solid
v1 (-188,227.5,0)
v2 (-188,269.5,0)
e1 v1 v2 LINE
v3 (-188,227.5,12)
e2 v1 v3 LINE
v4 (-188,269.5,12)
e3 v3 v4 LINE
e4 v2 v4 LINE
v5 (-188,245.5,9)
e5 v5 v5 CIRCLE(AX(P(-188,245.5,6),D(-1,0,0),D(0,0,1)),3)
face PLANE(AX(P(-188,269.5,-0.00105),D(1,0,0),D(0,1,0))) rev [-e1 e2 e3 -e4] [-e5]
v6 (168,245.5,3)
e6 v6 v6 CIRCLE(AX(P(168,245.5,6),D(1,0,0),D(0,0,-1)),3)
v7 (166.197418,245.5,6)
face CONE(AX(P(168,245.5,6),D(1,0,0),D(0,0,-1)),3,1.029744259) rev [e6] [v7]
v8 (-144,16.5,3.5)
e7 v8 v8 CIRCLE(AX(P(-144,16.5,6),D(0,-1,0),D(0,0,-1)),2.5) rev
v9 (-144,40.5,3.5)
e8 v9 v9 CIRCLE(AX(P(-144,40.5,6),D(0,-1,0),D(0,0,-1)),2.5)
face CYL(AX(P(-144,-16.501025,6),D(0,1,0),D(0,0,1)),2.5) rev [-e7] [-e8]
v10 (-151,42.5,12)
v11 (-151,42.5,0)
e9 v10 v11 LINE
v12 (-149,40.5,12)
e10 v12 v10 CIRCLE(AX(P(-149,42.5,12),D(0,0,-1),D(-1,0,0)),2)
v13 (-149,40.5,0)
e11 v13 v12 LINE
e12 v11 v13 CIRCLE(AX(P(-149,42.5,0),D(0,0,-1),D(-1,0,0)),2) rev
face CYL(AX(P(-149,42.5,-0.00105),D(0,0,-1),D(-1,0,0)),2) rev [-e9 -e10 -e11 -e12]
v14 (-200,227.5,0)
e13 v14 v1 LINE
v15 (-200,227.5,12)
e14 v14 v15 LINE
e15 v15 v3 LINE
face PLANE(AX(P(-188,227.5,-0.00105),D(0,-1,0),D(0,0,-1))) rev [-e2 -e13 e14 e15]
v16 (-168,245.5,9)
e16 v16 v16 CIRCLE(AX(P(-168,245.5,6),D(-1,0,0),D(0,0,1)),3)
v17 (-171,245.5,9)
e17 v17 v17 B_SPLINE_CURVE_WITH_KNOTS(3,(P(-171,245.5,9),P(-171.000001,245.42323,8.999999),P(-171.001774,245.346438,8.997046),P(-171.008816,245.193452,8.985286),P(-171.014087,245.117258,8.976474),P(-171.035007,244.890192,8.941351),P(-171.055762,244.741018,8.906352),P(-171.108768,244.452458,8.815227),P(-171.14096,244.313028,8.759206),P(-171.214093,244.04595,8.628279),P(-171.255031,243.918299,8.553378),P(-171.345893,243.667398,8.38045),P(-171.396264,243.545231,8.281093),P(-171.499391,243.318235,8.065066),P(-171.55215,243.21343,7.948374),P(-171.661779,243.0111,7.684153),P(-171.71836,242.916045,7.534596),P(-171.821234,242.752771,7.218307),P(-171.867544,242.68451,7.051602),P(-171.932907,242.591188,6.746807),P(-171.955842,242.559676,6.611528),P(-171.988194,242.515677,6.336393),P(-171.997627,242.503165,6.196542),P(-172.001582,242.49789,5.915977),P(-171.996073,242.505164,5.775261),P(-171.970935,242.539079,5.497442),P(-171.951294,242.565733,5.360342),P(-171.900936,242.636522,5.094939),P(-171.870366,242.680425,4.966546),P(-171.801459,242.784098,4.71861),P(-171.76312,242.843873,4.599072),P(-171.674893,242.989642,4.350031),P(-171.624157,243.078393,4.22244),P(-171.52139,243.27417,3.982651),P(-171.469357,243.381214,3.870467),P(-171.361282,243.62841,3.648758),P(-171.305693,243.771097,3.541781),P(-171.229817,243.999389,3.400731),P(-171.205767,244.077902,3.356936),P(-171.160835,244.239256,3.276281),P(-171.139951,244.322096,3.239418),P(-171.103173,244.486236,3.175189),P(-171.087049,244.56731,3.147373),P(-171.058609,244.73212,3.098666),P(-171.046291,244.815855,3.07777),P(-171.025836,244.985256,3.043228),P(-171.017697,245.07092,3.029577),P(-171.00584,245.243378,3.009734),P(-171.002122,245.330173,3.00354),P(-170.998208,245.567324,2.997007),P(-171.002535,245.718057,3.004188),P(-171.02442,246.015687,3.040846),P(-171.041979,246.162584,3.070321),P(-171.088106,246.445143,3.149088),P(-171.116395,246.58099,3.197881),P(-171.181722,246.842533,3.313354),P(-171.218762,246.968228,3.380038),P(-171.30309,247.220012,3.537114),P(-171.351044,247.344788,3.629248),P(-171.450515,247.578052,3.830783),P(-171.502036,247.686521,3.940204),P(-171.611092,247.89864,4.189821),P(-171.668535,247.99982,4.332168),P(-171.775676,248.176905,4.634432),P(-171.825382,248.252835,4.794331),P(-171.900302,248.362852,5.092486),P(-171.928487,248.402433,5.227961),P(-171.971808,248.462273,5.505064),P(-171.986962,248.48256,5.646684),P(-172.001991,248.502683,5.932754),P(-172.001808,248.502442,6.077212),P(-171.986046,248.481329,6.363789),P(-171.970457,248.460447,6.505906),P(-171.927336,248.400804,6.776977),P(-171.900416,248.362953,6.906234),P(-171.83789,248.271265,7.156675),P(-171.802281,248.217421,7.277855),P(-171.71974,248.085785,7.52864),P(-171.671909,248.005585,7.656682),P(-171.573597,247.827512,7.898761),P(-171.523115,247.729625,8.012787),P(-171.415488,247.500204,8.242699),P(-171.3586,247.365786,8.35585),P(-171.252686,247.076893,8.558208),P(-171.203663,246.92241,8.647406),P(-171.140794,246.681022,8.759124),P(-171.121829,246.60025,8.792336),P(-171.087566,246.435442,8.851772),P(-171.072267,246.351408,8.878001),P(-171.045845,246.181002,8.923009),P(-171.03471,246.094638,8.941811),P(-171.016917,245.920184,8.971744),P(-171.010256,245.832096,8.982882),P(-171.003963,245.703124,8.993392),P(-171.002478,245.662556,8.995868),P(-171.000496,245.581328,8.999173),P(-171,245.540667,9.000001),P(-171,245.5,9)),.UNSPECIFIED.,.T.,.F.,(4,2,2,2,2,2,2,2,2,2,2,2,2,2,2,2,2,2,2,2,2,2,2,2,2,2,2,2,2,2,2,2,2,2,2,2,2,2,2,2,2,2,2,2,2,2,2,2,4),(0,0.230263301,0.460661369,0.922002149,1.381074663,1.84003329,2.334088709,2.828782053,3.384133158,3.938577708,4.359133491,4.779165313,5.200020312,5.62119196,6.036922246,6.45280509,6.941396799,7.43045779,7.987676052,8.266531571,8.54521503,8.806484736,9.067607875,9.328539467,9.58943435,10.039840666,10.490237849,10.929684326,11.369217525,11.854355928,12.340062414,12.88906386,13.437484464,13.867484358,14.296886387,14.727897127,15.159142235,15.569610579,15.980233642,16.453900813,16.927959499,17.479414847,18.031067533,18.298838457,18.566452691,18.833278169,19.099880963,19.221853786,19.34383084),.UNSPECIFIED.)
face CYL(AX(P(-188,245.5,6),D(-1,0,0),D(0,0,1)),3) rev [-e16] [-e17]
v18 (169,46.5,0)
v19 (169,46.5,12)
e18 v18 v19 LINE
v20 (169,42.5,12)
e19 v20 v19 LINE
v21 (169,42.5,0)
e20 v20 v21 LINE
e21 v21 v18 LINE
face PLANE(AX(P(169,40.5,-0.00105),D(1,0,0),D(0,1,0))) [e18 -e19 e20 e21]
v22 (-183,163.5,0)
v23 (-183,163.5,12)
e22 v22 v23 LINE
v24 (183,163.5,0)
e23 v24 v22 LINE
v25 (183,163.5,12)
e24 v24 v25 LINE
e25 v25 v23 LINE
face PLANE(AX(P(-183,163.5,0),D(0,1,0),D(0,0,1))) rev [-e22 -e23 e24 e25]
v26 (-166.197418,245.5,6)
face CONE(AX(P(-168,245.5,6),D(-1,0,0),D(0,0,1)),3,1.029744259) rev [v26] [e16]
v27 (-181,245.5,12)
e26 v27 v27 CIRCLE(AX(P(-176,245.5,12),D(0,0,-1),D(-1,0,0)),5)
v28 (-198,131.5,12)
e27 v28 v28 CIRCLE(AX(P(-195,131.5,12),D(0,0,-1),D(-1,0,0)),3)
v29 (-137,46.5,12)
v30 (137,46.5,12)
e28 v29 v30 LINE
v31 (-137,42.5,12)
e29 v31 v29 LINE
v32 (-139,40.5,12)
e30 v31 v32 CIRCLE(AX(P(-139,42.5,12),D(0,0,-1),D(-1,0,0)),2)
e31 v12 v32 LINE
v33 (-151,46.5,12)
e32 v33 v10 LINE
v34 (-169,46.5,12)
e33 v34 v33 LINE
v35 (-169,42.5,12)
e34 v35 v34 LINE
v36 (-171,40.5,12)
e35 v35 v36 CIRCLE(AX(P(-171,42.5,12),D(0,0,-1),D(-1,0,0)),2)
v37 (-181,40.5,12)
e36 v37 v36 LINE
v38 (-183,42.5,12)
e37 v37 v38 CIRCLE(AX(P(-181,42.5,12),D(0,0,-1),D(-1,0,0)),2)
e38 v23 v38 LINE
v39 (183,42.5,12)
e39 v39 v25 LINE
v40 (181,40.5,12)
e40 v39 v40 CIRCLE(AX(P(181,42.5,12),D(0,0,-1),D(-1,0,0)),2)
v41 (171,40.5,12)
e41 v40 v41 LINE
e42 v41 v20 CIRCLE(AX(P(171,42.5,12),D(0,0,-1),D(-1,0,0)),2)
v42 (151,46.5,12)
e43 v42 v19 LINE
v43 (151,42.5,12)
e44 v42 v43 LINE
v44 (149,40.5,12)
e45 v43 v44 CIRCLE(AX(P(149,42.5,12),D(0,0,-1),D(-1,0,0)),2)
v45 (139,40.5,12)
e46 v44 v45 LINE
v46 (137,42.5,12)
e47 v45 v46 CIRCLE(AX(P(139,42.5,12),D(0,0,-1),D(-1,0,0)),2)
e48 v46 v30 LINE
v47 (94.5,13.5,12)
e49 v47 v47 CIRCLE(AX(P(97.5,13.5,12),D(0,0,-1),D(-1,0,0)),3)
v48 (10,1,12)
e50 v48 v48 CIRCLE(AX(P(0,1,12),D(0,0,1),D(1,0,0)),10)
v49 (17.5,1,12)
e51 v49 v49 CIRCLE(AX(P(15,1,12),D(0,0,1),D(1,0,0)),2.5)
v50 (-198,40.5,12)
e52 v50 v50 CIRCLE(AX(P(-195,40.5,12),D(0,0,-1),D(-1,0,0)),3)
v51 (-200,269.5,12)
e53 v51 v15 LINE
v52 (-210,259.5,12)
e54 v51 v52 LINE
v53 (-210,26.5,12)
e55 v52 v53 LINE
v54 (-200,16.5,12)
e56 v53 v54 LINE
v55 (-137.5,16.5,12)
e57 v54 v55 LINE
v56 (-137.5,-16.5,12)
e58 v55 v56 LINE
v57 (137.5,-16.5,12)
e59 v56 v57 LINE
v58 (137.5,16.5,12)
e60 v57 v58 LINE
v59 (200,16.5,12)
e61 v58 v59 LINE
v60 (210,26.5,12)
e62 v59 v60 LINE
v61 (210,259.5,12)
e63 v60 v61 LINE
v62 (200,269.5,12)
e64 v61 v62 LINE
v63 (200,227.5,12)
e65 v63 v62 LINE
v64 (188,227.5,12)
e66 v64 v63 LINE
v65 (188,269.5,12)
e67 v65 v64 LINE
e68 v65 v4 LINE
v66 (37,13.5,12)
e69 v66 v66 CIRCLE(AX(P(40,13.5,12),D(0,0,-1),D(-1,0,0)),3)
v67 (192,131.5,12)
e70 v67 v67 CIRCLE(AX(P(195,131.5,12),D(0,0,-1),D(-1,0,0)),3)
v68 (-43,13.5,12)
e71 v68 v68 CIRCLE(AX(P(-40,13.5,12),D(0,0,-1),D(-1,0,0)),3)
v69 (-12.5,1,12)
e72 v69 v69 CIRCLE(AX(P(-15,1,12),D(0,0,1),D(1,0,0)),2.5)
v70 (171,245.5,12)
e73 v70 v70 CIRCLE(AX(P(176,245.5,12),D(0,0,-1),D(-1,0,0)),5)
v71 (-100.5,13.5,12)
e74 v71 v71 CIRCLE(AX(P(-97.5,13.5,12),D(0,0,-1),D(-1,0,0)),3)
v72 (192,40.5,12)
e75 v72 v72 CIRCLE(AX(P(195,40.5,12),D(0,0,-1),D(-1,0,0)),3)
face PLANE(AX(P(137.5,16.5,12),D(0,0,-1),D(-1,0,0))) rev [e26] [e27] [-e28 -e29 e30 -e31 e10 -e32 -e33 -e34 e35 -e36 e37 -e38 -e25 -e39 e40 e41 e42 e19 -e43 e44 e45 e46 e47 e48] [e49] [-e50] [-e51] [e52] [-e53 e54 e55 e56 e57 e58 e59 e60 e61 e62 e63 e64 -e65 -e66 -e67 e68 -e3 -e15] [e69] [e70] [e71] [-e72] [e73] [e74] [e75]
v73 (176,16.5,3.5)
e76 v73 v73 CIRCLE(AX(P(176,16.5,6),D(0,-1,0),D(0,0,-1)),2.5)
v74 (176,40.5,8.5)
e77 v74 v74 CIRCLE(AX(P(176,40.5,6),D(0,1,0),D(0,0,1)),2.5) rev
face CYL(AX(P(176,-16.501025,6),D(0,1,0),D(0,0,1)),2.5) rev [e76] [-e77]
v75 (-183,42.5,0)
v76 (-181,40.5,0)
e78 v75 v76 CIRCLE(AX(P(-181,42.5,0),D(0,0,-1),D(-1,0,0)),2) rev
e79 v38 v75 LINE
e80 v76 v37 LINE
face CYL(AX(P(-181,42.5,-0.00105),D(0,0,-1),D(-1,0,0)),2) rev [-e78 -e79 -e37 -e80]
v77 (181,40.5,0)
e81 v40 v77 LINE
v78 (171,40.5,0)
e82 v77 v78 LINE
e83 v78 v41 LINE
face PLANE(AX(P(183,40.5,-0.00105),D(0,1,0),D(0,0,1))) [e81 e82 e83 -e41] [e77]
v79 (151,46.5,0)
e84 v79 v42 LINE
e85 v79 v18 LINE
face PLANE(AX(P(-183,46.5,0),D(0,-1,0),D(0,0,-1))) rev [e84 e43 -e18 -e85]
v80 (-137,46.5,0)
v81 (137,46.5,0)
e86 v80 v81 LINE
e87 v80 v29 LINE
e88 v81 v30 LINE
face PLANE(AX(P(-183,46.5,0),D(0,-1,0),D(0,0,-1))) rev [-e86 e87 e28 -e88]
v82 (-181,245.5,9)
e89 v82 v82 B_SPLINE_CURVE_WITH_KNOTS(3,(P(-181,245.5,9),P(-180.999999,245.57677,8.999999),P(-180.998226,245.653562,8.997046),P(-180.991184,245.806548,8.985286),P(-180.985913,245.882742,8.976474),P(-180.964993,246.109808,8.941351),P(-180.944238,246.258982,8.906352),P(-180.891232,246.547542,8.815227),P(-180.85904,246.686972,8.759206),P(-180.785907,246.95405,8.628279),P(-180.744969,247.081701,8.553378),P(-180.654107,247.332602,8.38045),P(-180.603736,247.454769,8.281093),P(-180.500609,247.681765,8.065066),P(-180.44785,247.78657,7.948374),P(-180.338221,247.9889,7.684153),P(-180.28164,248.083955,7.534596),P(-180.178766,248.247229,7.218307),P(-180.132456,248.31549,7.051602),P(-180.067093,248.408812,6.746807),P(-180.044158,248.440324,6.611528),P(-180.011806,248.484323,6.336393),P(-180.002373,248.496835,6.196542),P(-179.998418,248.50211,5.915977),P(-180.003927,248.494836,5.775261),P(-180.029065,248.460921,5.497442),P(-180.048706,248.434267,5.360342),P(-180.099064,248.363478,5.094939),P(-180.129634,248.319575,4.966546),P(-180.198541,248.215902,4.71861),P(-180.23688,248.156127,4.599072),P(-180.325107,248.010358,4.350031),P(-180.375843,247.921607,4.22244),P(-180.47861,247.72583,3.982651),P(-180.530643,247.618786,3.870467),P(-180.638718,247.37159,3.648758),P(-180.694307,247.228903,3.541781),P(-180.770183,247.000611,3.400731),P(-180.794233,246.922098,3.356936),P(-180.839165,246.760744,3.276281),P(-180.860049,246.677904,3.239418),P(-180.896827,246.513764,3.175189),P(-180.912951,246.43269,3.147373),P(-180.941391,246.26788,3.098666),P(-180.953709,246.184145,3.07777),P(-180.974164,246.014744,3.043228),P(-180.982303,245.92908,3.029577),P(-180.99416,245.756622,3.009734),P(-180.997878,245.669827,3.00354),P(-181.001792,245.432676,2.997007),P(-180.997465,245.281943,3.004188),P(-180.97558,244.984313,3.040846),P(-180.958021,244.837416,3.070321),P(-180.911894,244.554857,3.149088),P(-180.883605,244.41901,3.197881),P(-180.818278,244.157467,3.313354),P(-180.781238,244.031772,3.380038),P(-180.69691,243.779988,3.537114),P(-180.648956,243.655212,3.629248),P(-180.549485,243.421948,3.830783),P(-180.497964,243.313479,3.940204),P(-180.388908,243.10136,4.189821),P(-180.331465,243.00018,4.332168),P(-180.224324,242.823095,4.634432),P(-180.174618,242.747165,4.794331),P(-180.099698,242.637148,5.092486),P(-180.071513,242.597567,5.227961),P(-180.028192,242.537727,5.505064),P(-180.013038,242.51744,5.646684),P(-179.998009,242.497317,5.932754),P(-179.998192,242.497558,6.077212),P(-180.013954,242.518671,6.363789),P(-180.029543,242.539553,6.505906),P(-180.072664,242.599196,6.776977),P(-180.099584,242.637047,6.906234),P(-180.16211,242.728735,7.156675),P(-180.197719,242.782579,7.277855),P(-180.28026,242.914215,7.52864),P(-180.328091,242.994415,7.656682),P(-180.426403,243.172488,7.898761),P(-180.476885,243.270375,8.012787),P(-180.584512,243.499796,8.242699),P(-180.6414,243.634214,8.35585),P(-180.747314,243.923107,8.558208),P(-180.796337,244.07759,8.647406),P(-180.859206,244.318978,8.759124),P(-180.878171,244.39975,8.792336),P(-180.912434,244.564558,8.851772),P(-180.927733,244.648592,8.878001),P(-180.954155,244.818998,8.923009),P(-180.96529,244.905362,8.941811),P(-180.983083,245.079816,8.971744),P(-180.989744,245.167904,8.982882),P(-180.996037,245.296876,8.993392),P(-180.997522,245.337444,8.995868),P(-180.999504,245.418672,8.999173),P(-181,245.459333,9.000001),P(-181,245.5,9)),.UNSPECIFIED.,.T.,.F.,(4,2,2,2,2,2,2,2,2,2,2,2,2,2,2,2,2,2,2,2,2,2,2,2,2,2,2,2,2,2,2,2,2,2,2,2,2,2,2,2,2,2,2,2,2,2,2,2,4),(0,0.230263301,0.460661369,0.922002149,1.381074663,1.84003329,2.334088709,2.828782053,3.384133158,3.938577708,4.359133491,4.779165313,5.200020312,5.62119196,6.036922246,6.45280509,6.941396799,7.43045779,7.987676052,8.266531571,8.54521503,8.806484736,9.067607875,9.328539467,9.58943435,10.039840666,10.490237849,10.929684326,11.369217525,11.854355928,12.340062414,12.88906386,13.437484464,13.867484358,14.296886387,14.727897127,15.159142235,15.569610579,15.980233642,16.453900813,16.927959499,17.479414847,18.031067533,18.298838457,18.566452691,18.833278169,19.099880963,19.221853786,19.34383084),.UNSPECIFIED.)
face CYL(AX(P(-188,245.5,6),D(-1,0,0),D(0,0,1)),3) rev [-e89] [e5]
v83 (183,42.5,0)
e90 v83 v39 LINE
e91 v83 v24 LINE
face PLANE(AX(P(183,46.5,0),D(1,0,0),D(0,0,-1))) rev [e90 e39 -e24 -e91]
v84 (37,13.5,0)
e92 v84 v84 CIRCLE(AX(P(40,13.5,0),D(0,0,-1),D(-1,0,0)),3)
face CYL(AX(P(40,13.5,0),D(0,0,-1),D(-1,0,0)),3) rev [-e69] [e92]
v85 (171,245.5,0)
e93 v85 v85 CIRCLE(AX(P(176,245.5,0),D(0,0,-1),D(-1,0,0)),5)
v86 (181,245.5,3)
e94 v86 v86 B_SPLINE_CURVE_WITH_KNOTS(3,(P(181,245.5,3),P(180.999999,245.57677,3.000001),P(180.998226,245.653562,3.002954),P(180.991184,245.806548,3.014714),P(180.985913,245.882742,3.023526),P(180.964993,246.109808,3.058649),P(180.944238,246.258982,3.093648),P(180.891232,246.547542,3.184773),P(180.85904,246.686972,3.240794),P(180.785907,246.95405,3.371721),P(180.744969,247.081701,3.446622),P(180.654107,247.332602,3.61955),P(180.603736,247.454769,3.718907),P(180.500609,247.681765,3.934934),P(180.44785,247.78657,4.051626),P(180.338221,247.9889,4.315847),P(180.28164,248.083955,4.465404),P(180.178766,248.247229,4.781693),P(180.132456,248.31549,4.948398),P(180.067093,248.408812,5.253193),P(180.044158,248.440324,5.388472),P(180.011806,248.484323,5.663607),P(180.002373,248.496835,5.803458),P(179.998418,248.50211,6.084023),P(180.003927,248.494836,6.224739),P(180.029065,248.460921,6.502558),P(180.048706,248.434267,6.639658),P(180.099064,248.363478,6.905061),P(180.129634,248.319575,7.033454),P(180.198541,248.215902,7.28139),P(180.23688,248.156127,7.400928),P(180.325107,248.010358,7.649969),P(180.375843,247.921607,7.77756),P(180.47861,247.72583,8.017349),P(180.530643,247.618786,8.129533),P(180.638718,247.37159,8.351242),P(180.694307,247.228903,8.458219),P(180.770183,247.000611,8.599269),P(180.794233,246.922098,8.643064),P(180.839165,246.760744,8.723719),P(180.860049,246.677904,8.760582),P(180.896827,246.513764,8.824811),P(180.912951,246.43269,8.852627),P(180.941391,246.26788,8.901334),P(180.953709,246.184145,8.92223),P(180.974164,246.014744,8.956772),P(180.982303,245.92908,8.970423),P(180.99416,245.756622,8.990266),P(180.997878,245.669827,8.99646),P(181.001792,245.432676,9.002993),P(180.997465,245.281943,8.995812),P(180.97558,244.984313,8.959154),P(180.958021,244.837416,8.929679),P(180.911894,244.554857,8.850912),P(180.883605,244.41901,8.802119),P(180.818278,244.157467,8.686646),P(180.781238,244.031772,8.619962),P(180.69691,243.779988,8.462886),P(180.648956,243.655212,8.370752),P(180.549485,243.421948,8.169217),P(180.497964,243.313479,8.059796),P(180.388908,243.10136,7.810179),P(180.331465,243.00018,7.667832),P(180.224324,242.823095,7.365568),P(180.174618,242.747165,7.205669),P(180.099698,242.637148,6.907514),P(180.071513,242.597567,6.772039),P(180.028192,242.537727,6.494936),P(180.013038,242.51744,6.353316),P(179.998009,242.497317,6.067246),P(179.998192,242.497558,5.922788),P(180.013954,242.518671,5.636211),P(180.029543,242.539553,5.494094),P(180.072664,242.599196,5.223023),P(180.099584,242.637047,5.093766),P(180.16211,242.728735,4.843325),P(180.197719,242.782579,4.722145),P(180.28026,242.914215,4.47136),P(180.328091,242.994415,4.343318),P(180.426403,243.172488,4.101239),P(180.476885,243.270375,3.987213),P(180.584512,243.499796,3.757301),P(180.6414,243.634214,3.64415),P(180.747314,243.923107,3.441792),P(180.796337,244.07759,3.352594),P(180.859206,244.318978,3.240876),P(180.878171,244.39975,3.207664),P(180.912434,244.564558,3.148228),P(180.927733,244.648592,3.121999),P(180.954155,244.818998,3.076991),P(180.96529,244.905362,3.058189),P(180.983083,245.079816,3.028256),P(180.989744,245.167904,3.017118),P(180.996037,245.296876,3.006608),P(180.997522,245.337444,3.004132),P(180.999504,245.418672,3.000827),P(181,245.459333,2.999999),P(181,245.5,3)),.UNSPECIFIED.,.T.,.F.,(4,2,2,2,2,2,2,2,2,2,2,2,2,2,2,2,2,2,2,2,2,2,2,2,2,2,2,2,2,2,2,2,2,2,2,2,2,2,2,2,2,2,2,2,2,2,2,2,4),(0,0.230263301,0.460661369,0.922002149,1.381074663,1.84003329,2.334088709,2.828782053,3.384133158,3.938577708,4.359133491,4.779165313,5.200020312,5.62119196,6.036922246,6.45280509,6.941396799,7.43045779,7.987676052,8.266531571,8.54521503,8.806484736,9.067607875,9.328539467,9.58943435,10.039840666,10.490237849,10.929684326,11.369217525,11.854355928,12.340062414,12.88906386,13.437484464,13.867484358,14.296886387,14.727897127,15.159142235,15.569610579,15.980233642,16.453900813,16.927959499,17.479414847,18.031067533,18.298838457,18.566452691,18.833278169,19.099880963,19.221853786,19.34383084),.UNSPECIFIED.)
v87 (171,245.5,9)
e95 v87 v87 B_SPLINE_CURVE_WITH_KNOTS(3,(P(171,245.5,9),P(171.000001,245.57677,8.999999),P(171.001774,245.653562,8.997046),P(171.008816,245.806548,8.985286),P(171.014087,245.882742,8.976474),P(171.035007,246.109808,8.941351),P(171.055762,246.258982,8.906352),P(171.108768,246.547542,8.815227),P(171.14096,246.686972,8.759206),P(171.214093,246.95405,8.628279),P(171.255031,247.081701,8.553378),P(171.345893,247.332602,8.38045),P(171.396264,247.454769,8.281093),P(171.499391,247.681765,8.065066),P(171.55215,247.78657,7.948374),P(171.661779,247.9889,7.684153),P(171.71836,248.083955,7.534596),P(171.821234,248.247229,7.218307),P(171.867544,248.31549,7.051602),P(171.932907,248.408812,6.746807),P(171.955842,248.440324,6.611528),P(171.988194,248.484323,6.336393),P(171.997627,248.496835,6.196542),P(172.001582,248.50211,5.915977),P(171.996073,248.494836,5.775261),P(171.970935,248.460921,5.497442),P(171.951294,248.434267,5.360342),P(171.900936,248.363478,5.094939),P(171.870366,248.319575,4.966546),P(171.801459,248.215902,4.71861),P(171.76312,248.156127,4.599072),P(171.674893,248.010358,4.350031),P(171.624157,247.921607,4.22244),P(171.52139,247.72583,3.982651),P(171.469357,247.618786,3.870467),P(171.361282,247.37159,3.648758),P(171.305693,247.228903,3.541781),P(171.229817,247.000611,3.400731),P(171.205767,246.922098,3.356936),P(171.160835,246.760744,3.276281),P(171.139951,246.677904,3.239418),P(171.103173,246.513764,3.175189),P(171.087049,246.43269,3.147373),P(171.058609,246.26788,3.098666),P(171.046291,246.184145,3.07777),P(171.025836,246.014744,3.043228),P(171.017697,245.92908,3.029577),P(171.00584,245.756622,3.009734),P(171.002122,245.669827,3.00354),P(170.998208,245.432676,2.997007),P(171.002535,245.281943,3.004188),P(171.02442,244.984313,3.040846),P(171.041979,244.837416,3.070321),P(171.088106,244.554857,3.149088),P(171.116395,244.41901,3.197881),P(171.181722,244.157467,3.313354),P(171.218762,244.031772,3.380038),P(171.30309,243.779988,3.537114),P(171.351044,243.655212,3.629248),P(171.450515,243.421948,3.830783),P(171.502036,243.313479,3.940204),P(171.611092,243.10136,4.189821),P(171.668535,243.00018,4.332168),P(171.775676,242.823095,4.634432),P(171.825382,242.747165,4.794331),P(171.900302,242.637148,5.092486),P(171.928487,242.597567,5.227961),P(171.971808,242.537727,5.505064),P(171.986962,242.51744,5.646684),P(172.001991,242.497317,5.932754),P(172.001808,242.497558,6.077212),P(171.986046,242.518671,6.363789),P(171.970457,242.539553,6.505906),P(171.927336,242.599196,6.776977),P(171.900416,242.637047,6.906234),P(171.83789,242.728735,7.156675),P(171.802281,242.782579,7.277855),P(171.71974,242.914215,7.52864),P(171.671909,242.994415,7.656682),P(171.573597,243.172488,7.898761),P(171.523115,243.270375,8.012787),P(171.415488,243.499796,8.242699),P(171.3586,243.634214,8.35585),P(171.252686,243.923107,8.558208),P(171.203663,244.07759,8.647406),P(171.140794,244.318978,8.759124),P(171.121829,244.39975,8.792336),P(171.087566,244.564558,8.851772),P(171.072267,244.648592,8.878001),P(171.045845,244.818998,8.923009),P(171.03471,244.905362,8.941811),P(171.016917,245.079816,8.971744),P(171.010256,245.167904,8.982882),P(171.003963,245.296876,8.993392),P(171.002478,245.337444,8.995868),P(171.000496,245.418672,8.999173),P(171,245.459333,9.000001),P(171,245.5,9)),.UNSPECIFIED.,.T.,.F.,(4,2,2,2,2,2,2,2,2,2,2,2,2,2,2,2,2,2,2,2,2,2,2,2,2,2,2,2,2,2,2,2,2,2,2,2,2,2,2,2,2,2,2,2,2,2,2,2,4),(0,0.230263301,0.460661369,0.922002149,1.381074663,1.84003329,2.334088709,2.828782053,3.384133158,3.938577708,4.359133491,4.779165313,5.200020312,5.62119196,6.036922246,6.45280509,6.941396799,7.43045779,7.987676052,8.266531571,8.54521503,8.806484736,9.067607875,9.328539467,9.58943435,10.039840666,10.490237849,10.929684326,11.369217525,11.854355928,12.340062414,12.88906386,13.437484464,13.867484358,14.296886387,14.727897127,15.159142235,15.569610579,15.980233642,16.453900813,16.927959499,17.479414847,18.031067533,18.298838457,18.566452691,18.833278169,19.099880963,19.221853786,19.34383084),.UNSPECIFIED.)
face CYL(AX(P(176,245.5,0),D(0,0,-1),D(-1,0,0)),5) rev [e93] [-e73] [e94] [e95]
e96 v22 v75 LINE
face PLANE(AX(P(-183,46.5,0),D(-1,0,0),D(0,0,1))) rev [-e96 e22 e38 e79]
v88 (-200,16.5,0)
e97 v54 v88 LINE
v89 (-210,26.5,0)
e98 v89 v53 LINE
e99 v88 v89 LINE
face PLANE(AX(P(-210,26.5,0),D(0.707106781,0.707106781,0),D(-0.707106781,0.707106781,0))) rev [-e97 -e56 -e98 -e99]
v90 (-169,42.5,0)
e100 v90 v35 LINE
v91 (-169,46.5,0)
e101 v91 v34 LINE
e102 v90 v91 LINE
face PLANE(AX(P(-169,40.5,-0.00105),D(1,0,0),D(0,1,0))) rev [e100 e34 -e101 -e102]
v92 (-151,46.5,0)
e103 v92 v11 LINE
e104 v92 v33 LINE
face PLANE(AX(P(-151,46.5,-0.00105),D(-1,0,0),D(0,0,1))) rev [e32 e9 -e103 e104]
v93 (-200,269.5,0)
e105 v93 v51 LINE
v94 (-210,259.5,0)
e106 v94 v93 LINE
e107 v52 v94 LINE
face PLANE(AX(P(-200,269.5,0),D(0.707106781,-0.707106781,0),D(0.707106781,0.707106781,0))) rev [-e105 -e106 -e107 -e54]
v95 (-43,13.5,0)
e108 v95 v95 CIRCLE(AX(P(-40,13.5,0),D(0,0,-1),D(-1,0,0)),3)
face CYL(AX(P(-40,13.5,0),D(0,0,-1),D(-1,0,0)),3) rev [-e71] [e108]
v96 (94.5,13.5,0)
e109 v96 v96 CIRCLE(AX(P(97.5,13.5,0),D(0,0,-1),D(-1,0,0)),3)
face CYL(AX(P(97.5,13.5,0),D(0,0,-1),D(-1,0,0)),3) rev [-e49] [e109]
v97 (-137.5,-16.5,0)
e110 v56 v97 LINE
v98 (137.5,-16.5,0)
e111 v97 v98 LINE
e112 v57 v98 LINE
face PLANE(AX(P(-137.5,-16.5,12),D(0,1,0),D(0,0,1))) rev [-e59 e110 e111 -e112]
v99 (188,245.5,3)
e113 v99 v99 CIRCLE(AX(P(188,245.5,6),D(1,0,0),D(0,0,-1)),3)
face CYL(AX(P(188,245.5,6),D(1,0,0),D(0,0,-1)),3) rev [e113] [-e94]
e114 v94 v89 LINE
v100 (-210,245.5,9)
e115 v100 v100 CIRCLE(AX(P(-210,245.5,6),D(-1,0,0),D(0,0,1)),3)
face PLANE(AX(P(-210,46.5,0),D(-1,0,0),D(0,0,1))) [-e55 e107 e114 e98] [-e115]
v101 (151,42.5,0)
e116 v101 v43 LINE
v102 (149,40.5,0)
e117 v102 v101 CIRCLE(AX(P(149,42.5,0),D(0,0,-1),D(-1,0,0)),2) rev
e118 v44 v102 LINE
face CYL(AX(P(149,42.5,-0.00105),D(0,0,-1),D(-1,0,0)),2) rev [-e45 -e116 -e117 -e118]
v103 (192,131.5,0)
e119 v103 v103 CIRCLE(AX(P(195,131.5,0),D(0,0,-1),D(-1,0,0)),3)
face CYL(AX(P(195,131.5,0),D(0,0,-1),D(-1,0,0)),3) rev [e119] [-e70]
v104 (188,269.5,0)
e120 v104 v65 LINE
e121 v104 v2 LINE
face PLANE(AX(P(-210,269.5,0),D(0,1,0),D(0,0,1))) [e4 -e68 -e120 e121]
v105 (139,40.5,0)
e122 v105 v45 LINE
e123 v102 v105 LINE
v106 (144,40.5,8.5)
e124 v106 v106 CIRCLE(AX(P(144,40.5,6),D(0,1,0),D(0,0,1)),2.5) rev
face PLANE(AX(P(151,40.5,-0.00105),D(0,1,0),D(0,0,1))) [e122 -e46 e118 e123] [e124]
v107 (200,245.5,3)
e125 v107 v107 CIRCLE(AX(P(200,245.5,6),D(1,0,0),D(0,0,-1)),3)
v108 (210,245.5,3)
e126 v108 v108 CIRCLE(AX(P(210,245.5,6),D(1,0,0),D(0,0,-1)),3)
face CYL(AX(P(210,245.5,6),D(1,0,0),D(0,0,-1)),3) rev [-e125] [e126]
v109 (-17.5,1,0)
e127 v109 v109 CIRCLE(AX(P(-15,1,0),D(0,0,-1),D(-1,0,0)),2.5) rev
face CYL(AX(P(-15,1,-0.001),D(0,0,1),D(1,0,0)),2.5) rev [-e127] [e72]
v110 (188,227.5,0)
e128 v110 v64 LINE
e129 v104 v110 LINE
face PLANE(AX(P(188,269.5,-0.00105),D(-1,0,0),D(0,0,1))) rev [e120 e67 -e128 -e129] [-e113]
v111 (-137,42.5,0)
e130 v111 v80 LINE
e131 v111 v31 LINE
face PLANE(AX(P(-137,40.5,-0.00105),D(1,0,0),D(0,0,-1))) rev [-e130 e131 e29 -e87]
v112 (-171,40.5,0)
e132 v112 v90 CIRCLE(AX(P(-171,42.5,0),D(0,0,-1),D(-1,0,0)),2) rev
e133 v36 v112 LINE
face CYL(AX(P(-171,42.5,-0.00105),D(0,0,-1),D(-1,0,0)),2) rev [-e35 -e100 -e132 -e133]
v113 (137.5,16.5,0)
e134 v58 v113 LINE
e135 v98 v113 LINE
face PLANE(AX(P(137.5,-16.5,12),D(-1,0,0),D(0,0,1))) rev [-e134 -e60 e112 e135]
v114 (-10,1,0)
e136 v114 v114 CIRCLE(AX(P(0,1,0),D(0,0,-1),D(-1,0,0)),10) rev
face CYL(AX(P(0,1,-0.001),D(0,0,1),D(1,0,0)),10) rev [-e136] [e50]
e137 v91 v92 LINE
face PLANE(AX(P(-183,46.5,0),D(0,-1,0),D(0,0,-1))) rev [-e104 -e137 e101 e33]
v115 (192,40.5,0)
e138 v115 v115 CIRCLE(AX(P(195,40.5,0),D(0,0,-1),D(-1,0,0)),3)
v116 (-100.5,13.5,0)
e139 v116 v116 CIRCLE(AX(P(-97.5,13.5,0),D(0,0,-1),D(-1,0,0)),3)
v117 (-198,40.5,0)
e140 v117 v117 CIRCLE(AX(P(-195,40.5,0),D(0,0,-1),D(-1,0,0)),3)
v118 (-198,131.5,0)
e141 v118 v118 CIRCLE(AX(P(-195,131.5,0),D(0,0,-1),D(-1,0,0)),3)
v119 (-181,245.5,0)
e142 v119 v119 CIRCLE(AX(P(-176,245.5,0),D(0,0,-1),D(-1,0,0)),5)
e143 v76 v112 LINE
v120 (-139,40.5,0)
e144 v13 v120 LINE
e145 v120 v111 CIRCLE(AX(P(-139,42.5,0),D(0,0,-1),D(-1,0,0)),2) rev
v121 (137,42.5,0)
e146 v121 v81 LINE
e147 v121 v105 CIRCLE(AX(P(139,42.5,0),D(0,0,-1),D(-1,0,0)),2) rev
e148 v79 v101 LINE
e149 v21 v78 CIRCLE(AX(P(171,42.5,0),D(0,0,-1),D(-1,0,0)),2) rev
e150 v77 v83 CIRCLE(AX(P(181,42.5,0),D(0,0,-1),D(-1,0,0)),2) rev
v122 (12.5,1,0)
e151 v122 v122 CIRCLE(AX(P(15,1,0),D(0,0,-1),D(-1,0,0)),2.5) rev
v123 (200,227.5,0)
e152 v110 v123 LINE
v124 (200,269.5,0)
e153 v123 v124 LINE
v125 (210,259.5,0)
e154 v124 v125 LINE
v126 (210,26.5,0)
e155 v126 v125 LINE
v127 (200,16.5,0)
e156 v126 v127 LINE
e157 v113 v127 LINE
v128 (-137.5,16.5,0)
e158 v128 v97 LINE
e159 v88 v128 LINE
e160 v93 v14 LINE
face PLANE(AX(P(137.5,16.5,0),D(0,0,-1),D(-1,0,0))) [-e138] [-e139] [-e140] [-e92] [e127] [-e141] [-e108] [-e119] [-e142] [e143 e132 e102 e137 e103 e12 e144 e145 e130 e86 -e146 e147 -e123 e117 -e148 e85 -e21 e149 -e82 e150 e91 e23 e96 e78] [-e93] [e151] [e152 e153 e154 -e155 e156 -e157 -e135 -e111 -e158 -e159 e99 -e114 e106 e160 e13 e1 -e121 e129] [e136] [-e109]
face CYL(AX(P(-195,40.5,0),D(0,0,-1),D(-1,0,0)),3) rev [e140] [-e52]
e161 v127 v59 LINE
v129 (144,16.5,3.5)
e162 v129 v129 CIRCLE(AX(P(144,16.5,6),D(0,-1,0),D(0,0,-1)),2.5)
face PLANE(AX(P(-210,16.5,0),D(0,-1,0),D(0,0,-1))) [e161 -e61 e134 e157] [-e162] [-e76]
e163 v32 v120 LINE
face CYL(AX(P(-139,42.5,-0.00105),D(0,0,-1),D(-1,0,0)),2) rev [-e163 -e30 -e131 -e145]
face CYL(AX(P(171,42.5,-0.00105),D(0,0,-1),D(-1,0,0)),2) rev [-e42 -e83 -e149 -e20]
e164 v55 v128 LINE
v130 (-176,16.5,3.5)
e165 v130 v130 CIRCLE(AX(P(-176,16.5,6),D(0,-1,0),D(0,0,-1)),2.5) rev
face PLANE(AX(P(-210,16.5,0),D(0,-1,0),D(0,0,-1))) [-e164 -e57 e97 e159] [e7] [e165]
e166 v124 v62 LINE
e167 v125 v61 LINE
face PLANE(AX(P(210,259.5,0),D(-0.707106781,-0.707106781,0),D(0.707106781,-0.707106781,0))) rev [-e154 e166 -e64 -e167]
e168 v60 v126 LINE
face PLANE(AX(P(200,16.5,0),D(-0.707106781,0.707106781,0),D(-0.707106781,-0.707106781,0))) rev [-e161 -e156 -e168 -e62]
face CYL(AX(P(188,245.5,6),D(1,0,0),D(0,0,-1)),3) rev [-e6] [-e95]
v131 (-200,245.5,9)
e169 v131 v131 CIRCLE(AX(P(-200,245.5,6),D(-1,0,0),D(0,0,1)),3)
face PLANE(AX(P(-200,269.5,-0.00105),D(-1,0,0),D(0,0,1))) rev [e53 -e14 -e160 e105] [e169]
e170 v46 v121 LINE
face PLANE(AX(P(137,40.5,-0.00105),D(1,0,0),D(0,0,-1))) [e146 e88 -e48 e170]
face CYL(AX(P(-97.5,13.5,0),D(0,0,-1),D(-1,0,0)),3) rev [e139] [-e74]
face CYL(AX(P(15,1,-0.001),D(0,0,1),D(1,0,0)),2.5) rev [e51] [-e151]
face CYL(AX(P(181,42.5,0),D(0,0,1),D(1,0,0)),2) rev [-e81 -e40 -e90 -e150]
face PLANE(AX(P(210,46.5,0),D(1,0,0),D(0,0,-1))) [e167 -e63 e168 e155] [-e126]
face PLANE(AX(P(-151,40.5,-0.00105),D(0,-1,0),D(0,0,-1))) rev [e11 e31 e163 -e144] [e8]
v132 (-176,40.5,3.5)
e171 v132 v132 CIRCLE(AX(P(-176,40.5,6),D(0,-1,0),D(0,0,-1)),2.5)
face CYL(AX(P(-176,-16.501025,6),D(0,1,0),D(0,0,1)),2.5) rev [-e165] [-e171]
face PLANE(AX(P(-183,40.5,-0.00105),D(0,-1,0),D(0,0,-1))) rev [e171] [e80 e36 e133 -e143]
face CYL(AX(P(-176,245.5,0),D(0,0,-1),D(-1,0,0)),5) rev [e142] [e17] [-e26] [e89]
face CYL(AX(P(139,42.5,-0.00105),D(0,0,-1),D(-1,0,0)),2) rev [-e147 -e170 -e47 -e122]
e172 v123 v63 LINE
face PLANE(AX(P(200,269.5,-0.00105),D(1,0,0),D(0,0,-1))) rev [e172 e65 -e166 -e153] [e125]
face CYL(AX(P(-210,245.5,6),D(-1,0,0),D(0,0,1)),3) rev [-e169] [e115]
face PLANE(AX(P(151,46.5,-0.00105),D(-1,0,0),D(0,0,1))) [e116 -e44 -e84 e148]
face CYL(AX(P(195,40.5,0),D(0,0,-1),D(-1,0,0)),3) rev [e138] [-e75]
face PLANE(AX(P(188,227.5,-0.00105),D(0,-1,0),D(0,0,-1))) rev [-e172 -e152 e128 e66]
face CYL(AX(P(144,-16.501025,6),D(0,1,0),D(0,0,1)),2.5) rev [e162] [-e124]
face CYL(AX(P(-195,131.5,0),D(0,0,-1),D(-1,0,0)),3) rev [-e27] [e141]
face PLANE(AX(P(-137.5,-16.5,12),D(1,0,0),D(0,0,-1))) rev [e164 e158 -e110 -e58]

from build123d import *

# Parameters (mm, degrees)
SKETCH1_W                  = 275
SKETCH1_H                  = 33
BOSS_EXTRUDE1_DEPTH        = 12
CUT_EXTRUDE1_REACH         = 141.005
SKETCH2_R                  = 10
SKETCH2_R_2                = 2.5
SKETCH3_W                  = 366
SKETCH3_H                  = 117
BOSS_EXTRUDE2_DEPTH        = 12
CUT_EXTRUDE2_REACH         = 308.55
SKETCH4_R                  = 2.5
CUT_EXTRUDE3_REACH         = 343.869
SKETCH5_W                  = 14
SKETCH5_H                  = 6
FILLET1_R                  = 2
FILLET1_OF_MIRROR2_R       = 2
CHAMFER1_SIZE              = 10
CUT_EXTRUDE6_REACH         = 343.869
SKETCH8_W                  = 12
SKETCH8_H                  = 42
CHAMFER2_SIZE              = 10
F_6_0_6_DIAMETER_HOLE1_D   = 6
F_10_0_10_DIAMETER_HOLE1_D = 10
F_6_0_6_DIAMETER_HOLE4_D   = 6


with BuildPart() as part:
    # Sketch1 → Boss-Extrude1 (new body)
    with BuildSketch(Plane.XY):
        Rectangle(SKETCH1_W, SKETCH1_H)
    extrude(amount=BOSS_EXTRUDE1_DEPTH)

    # Sketch2 → Cut-Extrude1 (cut, up to next)
    with BuildSketch(Plane.XY.offset(12), mode=Mode.PRIVATE) as cut_extrude1_sk1:
        with Locations((0, 1)):
            Circle(SKETCH2_R)
    cut_extrude1_tool1 = extrude(cut_extrude1_sk1.sketch, amount=-CUT_EXTRUDE1_REACH, mode=Mode.PRIVATE) & part.part
    # Sketch2 → Cut-Extrude1 (cut, up to next)
    with BuildSketch(Plane.XY.offset(12), mode=Mode.PRIVATE) as cut_extrude1_sk2:
        with Locations((-15, 1)):
            Circle(SKETCH2_R_2)
    cut_extrude1_tool2 = extrude(cut_extrude1_sk2.sketch, amount=-CUT_EXTRUDE1_REACH, mode=Mode.PRIVATE) & part.part
    # Sketch2 → Cut-Extrude1 (cut, up to next)
    with BuildSketch(Plane.XY.offset(12), mode=Mode.PRIVATE) as cut_extrude1_sk3:
        with Locations((15, 1)):
            Circle(SKETCH2_R_2)
    cut_extrude1_tool3 = extrude(cut_extrude1_sk3.sketch, amount=-CUT_EXTRUDE1_REACH, mode=Mode.PRIVATE) & part.part
    add(cut_extrude1_tool1.solids().sort_by_distance((0, 1, 12))[0], mode=Mode.SUBTRACT)
    add(cut_extrude1_tool2.solids().sort_by_distance((-15, 1, 12))[0], mode=Mode.SUBTRACT)
    add(cut_extrude1_tool3.solids().sort_by_distance((15, 1, 12))[0], mode=Mode.SUBTRACT)

    # Sketch3 → Boss-Extrude2 (add)
    with BuildSketch(Plane.XY.offset(12)):
        Polygon((-210, 16.5), (210, 16.5), (210, 46.5), (210, 269.5), (-210, 269.5), (-210, 46.5), align=None)
        with Locations((0, 105)):
            Rectangle(SKETCH3_W, SKETCH3_H, mode=Mode.SUBTRACT)
    extrude(amount=-BOSS_EXTRUDE2_DEPTH)

    # Sketch4 → Cut-Extrude2 (cut, up to next)
    with BuildSketch(Plane(origin=(0, 46.5, 0), x_dir=(1, 0, 0), z_dir=(0, 1, 0)), mode=Mode.PRIVATE) as cut_extrude2_sk1:
        with Locations(Location((-144, -6, 0), (0, 0, 270))):
            Circle(SKETCH4_R)
    cut_extrude2_tool1 = extrude(cut_extrude2_sk1.sketch, amount=-CUT_EXTRUDE2_REACH, mode=Mode.PRIVATE) & part.part
    # Sketch4 → Cut-Extrude2 (cut, up to next)
    with BuildSketch(Plane(origin=(0, 46.5, 0), x_dir=(1, 0, 0), z_dir=(0, 1, 0)), mode=Mode.PRIVATE) as cut_extrude2_sk2:
        with Locations(Location((-176, -6, 0), (0, 0, 270))):
            Circle(SKETCH4_R)
    cut_extrude2_tool2 = extrude(cut_extrude2_sk2.sketch, amount=-CUT_EXTRUDE2_REACH, mode=Mode.PRIVATE) & part.part
    cut_extrude2_1 = cut_extrude2_tool1.solids().sort_by_distance((-144, 46.5, 6))[0]
    add(cut_extrude2_1, mode=Mode.SUBTRACT)
    cut_extrude2_2 = cut_extrude2_tool2.solids().sort_by_distance((-176, 46.5, 6))[0]
    add(cut_extrude2_2, mode=Mode.SUBTRACT)
    cut_extrude2 = cut_extrude2_1 + cut_extrude2_2  # Cut-Extrude2 as one shape, for the pattern or mirror that repeats it

    # Mirror1: Cut-Extrude2 across plane
    add(cut_extrude2.mirror(Plane(origin=(0, 0, 0), x_dir=(0, 0, 1), z_dir=(1, 0, 0))), mode=Mode.SUBTRACT)

    # Sketch5 → Cut-Extrude3 (cut, up to next)
    with BuildSketch(Plane.XY.offset(12), mode=Mode.PRIVATE) as cut_extrude3_sk1:
        with Locations((-176, 43.5)):
            Rectangle(SKETCH5_W, SKETCH5_H)
    cut_extrude3_tool1 = extrude(cut_extrude3_sk1.sketch, amount=-CUT_EXTRUDE3_REACH, mode=Mode.PRIVATE) & part.part
    # Sketch5 → Cut-Extrude3 (cut, up to next)
    with BuildSketch(Plane.XY.offset(12), mode=Mode.PRIVATE) as cut_extrude3_sk2:
        with Locations((-144, 43.5)):
            Rectangle(SKETCH5_W, SKETCH5_H)
    cut_extrude3_tool2 = extrude(cut_extrude3_sk2.sketch, amount=-CUT_EXTRUDE3_REACH, mode=Mode.PRIVATE) & part.part
    cut_extrude3_1 = cut_extrude3_tool1.solids().sort_by_distance((-176, 43.5, 12))[0]
    add(cut_extrude3_1, mode=Mode.SUBTRACT)
    cut_extrude3_2 = cut_extrude3_tool2.solids().sort_by_distance((-144, 43.5, 12))[0]
    add(cut_extrude3_2, mode=Mode.SUBTRACT)
    cut_extrude3 = cut_extrude3_1 + cut_extrude3_2  # Cut-Extrude3 as one shape, for the pattern or mirror that repeats it

    # Fillet1
    fillet1_edges = [part.edges().sort_by_distance(p)[0] for p in [
        (-169, 40.5, 6),
        (-183, 40.5, 6),
        (-137, 40.5, 6),
        (-151, 40.5, 6),
    ]]
    fillet(fillet1_edges, radius=FILLET1_R)

    # Mirror2: Cut-Extrude3 across plane
    add(cut_extrude3.mirror(Plane(origin=(0, 0, 0), x_dir=(0, 0, 1), z_dir=(1, 0, 0))), mode=Mode.SUBTRACT)

    # Fillet1 of Mirror2
    fillet1_of_mirror2_edges = [part.edges().sort_by_distance(p)[0] for p in [
        (169, 40.5, 6),
        (183, 40.5, 6),
        (137, 40.5, 6),
        (151, 40.5, 6),
    ]]
    fillet(fillet1_of_mirror2_edges, radius=FILLET1_OF_MIRROR2_R)

    # Chamfer1
    chamfer1_edges = [part.edges().sort_by_distance(p)[0] for p in [
        (210, 16.5, 6),
        (-210, 16.5, 6),
    ]]
    chamfer(chamfer1_edges, length=CHAMFER1_SIZE)

    # Sketch8 → Cut-Extrude6 (cut, up to next)
    with BuildSketch(Plane.XY.offset(12), mode=Mode.PRIVATE) as cut_extrude6_sk1:
        with Locations((-194, 248.5)):
            Rectangle(SKETCH8_W, SKETCH8_H)
    cut_extrude6_tool1 = extrude(cut_extrude6_sk1.sketch, amount=-CUT_EXTRUDE6_REACH, mode=Mode.PRIVATE) & part.part
    # Sketch8 → Cut-Extrude6 (cut, up to next)
    with BuildSketch(Plane.XY.offset(12), mode=Mode.PRIVATE) as cut_extrude6_sk2:
        with Locations((194, 248.5)):
            Rectangle(SKETCH8_W, SKETCH8_H)
    cut_extrude6_tool2 = extrude(cut_extrude6_sk2.sketch, amount=-CUT_EXTRUDE6_REACH, mode=Mode.PRIVATE) & part.part
    add(cut_extrude6_tool1.solids().sort_by_distance((-194, 248.5, 12))[0], mode=Mode.SUBTRACT)
    add(cut_extrude6_tool2.solids().sort_by_distance((194, 248.5, 12))[0], mode=Mode.SUBTRACT)

    # Chamfer2
    chamfer2_edges = [part.edges().sort_by_distance(p)[0] for p in [
        (210, 269.5, 6),
        (-210, 269.5, 6),
    ]]
    chamfer(chamfer2_edges, length=CHAMFER2_SIZE - 0.0001)  # a hair under: the kernel refuses the full size

    # Ø6.0 (6) Diameter Hole1 (through all)
    with Locations(Plane(origin=(0, 0, 0), x_dir=(-1, 0, 0), z_dir=(0, 0, -1))):
        with Locations((195, 131.5), (195, 40.5)):
            f_6_0_6_diameter_hole1 = Hole(F_6_0_6_DIAMETER_HOLE1_D / 2)

    # Ø10.0 (10) Diameter Hole1 (through all)
    with Locations(Plane(origin=(0, 0, 0), x_dir=(-1, 0, 0), z_dir=(0, 0, -1))):
        with Locations((176, 245.5)):
            f_10_0_10_diameter_hole1 = Hole(F_10_0_10_DIAMETER_HOLE1_D / 2)

    # Sketch13 → Ø6.0 (6) Diameter Hole2 (revolve, cut)
    with BuildSketch(Plane(origin=(-188, 245.5, 6), x_dir=(0, 0, 1), z_dir=(0, 1, 0))):
        Polygon((0, 0), (0, 21.802581857), (3, 20), (3, 0), align=None)
    f_6_0_6_diameter_hole2 = revolve(axis=Axis((-194.35, 245.5, 6), (1, 0, 0)), mode=Mode.SUBTRACT)

    # Sketch15 → Ø6.0 (6) Diameter Hole3 (revolve, cut)
    with BuildSketch(Plane(origin=(-210, 245.5, 6), x_dir=(0, 0, 1), z_dir=(0, 1, 0))):
        Polygon((0, 0), (0, 21.802581857), (3, 20), (3, 0), align=None)
    f_6_0_6_diameter_hole3 = revolve(axis=Axis((-216.35, 245.5, 6), (1, 0, 0)), mode=Mode.SUBTRACT)

    # Mirror3: Ø6.0 (6) Diameter Hole1, Ø10.0 (10) Diameter Hole1, Ø6.0 (6) Diameter Hole2, Ø6.0 (6) Diameter Hole3 across plane
    add(f_6_0_6_diameter_hole1.mirror(Plane(origin=(0, 0, 0), x_dir=(0, 0, 1), z_dir=(1, 0, 0))), mode=Mode.SUBTRACT)
    add(f_10_0_10_diameter_hole1.mirror(Plane(origin=(0, 0, 0), x_dir=(0, 0, 1), z_dir=(1, 0, 0))), mode=Mode.SUBTRACT)
    add(f_6_0_6_diameter_hole2.mirror(Plane(origin=(0, 0, 0), x_dir=(0, 0, 1), z_dir=(1, 0, 0))), mode=Mode.SUBTRACT)
    add(f_6_0_6_diameter_hole3.mirror(Plane(origin=(0, 0, 0), x_dir=(0, 0, 1), z_dir=(1, 0, 0))), mode=Mode.SUBTRACT)

    # Ø6.0 (6) Diameter Hole4 (through all)
    with Locations(Plane(origin=(0, 0, 0), x_dir=(-1, 0, 0), z_dir=(0, 0, -1))):
        with Locations((-97.5, 13.5), (-40, 13.5), (40, 13.5), (97.5, 13.5)):
            Hole(F_6_0_6_DIAMETER_HOLE4_D / 2)


solid = part.part
